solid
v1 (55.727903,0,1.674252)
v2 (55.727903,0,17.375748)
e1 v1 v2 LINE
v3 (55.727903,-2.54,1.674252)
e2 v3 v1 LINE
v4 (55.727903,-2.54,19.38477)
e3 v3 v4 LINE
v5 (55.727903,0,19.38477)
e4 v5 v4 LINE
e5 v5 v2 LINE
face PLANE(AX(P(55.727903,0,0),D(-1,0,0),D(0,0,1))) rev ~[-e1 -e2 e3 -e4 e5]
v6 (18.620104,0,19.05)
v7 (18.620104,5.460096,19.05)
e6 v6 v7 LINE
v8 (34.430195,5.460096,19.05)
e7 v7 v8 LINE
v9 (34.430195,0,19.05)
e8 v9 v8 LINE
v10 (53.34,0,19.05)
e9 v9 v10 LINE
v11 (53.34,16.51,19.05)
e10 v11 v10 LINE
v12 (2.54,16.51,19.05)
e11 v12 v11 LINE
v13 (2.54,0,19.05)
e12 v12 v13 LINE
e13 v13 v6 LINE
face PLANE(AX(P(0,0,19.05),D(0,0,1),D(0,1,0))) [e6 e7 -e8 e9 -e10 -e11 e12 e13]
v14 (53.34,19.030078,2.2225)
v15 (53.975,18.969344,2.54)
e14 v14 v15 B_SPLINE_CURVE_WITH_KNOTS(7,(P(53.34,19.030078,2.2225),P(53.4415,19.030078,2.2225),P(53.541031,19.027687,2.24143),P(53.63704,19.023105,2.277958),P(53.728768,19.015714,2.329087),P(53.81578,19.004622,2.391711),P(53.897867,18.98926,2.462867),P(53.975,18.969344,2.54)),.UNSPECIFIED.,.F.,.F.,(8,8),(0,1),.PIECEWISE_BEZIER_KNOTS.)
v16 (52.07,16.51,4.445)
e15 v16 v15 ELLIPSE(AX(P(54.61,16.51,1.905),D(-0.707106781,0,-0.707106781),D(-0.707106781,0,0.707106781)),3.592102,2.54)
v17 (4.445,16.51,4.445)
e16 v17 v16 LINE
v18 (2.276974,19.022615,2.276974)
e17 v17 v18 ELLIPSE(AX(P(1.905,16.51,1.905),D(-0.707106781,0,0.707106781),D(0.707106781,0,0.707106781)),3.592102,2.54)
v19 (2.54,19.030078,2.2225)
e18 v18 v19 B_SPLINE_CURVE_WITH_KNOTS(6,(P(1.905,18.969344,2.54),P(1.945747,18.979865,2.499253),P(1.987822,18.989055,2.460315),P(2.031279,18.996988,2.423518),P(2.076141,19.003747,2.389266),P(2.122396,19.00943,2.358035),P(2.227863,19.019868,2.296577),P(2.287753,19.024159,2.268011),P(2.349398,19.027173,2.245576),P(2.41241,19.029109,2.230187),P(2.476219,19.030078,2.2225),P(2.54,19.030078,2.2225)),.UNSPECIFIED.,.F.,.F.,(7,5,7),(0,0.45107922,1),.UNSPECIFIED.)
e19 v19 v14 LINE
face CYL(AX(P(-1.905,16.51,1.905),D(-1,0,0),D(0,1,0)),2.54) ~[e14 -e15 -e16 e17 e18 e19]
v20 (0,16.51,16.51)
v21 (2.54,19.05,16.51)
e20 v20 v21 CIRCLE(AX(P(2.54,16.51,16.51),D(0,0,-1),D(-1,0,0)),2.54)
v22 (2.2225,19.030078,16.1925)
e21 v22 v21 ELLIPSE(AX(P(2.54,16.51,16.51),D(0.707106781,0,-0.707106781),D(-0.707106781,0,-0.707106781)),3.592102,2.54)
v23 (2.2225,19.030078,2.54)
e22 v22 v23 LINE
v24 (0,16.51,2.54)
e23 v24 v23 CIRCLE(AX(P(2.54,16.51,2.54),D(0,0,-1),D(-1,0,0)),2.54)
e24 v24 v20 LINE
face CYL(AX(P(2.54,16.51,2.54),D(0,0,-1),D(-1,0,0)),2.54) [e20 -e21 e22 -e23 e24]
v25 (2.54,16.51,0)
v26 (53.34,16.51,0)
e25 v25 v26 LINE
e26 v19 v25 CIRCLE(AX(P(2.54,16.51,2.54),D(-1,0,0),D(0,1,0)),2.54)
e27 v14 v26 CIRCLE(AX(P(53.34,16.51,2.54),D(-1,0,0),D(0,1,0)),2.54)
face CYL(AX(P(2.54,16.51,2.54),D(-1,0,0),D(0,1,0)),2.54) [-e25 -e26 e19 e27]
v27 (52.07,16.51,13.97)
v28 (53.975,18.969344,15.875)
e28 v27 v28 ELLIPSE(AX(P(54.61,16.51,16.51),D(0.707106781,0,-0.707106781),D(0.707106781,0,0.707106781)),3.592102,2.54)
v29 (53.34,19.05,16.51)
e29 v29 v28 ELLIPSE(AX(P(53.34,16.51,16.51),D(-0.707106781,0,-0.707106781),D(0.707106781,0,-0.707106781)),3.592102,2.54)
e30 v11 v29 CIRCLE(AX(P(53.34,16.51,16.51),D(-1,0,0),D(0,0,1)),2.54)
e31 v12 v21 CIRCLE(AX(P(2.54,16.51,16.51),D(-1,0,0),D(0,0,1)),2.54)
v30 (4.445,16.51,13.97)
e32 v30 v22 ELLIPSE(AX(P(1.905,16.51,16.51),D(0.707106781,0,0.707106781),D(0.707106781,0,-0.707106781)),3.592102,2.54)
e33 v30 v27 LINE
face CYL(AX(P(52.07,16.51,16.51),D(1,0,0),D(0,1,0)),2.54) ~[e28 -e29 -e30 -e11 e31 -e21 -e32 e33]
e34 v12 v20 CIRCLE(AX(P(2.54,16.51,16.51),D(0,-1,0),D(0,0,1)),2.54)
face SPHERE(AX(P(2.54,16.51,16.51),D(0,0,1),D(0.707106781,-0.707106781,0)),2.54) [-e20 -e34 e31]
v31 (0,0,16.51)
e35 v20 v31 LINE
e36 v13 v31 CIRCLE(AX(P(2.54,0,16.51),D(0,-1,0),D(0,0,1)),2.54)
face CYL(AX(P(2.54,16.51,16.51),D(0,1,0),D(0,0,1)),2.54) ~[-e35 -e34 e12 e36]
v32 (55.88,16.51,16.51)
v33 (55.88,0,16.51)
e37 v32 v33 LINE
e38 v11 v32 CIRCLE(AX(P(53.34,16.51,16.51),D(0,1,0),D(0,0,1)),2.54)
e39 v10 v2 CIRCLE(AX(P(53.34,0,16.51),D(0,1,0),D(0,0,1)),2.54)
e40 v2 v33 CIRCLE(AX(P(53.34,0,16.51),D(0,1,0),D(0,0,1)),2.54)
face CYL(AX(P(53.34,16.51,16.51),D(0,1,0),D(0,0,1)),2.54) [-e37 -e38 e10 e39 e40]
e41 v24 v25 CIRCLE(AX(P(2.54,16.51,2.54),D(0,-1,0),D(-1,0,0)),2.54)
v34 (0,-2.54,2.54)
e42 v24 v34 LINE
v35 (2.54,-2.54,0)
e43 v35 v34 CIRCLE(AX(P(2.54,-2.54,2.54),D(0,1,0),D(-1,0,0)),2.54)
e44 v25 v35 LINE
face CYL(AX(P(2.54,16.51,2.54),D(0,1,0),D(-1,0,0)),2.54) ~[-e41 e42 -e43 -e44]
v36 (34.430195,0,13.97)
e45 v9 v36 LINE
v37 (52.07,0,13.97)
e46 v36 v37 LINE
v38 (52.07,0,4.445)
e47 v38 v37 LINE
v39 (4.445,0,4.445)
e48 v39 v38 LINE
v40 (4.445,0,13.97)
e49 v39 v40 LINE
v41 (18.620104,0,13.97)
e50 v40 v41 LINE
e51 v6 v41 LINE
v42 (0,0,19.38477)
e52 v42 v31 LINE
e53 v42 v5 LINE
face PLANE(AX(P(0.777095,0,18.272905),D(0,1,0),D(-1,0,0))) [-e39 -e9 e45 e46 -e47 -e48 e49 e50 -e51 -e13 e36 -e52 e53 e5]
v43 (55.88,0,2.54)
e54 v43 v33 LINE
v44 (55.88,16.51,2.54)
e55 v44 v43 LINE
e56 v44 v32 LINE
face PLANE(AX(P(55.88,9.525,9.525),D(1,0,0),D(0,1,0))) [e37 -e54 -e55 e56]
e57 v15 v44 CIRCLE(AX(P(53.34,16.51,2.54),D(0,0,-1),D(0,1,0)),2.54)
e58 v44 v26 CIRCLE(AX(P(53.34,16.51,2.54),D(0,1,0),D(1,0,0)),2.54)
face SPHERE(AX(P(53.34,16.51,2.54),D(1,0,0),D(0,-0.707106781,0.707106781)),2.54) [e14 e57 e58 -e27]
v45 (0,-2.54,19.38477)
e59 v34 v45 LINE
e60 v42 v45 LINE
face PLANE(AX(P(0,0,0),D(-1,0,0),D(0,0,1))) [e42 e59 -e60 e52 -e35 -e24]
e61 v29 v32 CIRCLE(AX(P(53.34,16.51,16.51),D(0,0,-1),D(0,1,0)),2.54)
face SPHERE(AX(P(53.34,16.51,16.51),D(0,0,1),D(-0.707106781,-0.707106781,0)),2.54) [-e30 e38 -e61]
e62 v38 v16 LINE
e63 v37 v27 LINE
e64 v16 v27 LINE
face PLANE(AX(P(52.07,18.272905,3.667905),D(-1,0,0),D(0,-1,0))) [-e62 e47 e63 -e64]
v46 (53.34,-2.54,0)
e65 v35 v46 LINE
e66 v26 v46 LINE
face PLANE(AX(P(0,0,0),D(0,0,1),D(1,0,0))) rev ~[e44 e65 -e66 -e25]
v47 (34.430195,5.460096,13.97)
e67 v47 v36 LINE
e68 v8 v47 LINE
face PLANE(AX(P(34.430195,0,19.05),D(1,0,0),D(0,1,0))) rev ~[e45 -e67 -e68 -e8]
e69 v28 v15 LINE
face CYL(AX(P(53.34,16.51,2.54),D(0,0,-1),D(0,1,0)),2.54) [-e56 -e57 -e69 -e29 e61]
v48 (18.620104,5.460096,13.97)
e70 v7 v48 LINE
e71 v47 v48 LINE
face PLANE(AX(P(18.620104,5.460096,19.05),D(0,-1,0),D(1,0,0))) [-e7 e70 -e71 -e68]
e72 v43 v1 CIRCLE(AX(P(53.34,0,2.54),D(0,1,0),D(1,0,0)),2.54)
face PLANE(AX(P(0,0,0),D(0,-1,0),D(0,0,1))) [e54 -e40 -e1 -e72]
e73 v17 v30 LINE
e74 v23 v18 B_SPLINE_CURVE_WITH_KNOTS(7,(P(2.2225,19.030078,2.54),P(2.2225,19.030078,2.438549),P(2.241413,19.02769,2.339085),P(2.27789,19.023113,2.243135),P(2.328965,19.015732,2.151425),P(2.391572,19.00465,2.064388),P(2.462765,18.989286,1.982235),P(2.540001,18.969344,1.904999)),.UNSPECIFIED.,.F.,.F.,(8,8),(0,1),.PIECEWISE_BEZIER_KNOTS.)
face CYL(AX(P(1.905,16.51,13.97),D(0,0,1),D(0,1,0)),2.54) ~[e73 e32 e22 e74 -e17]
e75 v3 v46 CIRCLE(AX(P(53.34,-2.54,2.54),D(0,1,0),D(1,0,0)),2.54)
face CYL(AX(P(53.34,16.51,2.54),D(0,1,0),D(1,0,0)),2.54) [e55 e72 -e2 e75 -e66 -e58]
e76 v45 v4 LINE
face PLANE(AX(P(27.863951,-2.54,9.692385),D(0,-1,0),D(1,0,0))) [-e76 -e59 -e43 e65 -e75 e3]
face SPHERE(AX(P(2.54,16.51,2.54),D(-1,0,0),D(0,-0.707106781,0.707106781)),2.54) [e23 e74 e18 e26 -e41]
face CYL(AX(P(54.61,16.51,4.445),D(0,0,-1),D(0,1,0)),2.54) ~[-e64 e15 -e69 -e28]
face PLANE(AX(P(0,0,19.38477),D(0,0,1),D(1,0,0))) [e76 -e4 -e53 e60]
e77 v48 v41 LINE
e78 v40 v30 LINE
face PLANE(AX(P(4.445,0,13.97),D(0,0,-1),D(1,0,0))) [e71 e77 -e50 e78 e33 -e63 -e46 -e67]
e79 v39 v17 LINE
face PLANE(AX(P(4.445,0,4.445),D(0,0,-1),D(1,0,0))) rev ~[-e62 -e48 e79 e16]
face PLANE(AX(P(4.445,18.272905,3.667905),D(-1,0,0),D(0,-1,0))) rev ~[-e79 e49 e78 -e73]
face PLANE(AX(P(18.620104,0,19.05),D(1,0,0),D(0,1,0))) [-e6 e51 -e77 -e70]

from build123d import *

# Parameters (mm, degrees)
F0_W         = 19.05
F0_H         = 19.05
F1_DEPTH     = 55.88
F2_W         = 47.625
F2_H         = 9.525
F3_DEPTH     = 25.4
F4_W         = 55.7279027998
F4_H         = 19.3847697228
F5_DEPTH     = 2.54
F6_T1_DEPTH  = 50.8
F6_T3_DEPTH  = 13.97
F6_T5_DEPTH  = 47.625
F6_T7_DEPTH  = 9.525
F6_T9_DEPTH  = 16.51
F6_T11_DEPTH = 25.4
F6_T13_DEPTH = 22.86
F6_S17_W     = 2.5908
F6_S17_H     = 2.5908
F6_T18_DEPTH = 2.5908
F6_S23_W     = 2.5908
F6_S23_H     = 2.5908
F6_T24_DEPTH = 2.5908
F6_S29_W     = 2.5908
F6_S29_H     = 2.5908
F6_T30_DEPTH = 2.5908
F6_S35_W     = 2.5908
F6_S35_H     = 2.5908
F6_T36_DEPTH = 2.5908
F6_T43_DEPTH = 53.975
F6_T48_DEPTH = 15.875
F6_T56_DEPTH = 53.975
F6_T61_DEPTH = 15.875
F6_T69_DEPTH = 15.875
F6_T74_DEPTH = 53.975
F6_T82_DEPTH = 53.975
F6_T87_DEPTH = 15.875
F7_W         = 15.8100910485
F7_H         = 5.4600955918
F8_DEPTH     = 12.7


# Not quite as in the source:
# - a fillet or chamfer that OpenCascade refuses, or shapes differently, is made with other operations: its cross-section is extruded or revolved along the edge and cut away or added


with BuildPart() as f1:
    # F0 (on Right) → F1 (new body)
    with BuildSketch(Plane.YZ):
        with Locations((9.525, 9.525)):
            Rectangle(F0_W, F0_H)
    extrude(amount=F1_DEPTH)

    # F2 (on face) → F3 (cut)
    with BuildSketch(Plane.XZ):
        with Locations((28.2575, 9.2075)):
            Rectangle(F2_W, F2_H)
    extrude(amount=-F3_DEPTH, mode=Mode.SUBTRACT)

    # F4 (on Front) → F5 (join)
    with BuildSketch(Plane.XZ):
        with Locations((27.8639513999, 9.6923848614)):
            Rectangle(F4_W, F4_H)
    extrude(amount=F5_DEPTH)

    # F6: fillet of radius 2.54 on 12 edges, made by hand

    # F6_s2 → F6_t1 (cut)
    with BuildSketch(Plane.YZ.offset(2.54)):
        with BuildLine():
            ThreePointArc((19.05, 2.54), (18.3060512242, 0.7439487758), (16.51, 0))
            Line((16.51, 0), (19.05, 0))
            Line((19.05, 0), (19.05, 2.54))
        make_face()
        with BuildLine():
            ThreePointArc((16.51, 19.05), (18.3060512242, 18.3060512242), (19.05, 16.51))
            Line((19.05, 16.51), (19.05, 19.05))
            Line((19.05, 19.05), (16.51, 19.05))
        make_face()
    extrude(amount=F6_T1_DEPTH, mode=Mode.SUBTRACT)

    # F6_s4 → F6_t3 (cut)
    with BuildSketch(Plane.XY.offset(2.54)):
        with BuildLine():
            ThreePointArc((0, 16.51), (0.7439487758, 18.3060512242), (2.54, 19.05))
            Line((2.54, 19.05), (0, 19.05))
            Line((0, 19.05), (0, 16.51))
        make_face()
        with BuildLine():
            ThreePointArc((53.34, 19.05), (55.1360512242, 18.3060512242), (55.88, 16.51))
            Line((55.88, 16.51), (55.88, 19.05))
            Line((55.88, 19.05), (53.34, 19.05))
        make_face()
    extrude(amount=F6_T3_DEPTH, mode=Mode.SUBTRACT)

    # F6_s6 → F6_t5 (cut)
    with BuildSketch(Plane.YZ.offset(4.445)):
        with BuildLine():
            ThreePointArc((19.05, 16.51), (18.3060512242, 14.7139487758), (16.51, 13.97))
            Line((16.51, 13.97), (19.05, 13.97))
            Line((19.05, 13.97), (19.05, 16.51))
        make_face()
        with BuildLine():
            ThreePointArc((19.05, 1.905), (18.3060512242, 3.7010512242), (16.51, 4.445))
            Line((16.51, 4.445), (19.05, 4.445))
            Line((19.05, 4.445), (19.05, 1.905))
        make_face()
    extrude(amount=F6_T5_DEPTH, mode=Mode.SUBTRACT)

    # F6_s8 → F6_t7 (cut)
    with BuildSketch(Plane.XY.offset(4.445)):
        with BuildLine():
            ThreePointArc((1.905, 19.05), (3.7010512242, 18.3060512242), (4.445, 16.51))
            Line((4.445, 16.51), (4.445, 19.05))
            Line((4.445, 19.05), (1.905, 19.05))
        make_face()
        with BuildLine():
            ThreePointArc((54.61, 19.05), (52.8139487758, 18.3060512242), (52.07, 16.51))
            Line((52.07, 16.51), (52.07, 19.05))
            Line((52.07, 19.05), (54.61, 19.05))
        make_face()
    extrude(amount=F6_T7_DEPTH, mode=Mode.SUBTRACT)

    # F6_s10 → F6_t9 (cut)
    with BuildSketch(Plane.XZ.offset(-16.51)):
        with BuildLine():
            ThreePointArc((2.54, 19.05), (0.7439487758, 18.3060512242), (0, 16.51))
            Line((0, 16.51), (0, 19.05))
            Line((0, 19.05), (2.54, 19.05))
        make_face()
        with BuildLine():
            ThreePointArc((53.34, 19.05), (55.1360512242, 18.3060512242), (55.88, 16.51))
            Line((55.88, 16.51), (55.88, 19.05))
            Line((55.88, 19.05), (53.34, 19.05))
        make_face()
    extrude(amount=F6_T9_DEPTH, mode=Mode.SUBTRACT)

    # F6_s12 → F6_t11 (cut)
    with BuildSketch(Plane.XZ.offset(-16.51)):
        with BuildLine():
            ThreePointArc((0, 2.54), (0.7439487758, 0.7439487758), (2.54, 0))
            Line((2.54, 0), (0, 0))
            Line((0, 0), (0, 2.54))
        make_face()
    extrude(amount=F6_T11_DEPTH, mode=Mode.SUBTRACT)

    # F6_s14 → F6_t13 (cut)
    with BuildSketch(Plane.XZ.offset(-16.51)):
        with BuildLine():
            ThreePointArc((55.88, 2.54), (55.1360512242, 0.7439487758), (53.34, 0))
            Line((53.34, 0), (55.88, 0))
            Line((55.88, 0), (55.88, 2.54))
        make_face()
    extrude(amount=F6_T13_DEPTH, mode=Mode.SUBTRACT)


with BuildPart() as f6_tool16:
    # F6_s17 → F6_t18 (new body)
    with BuildSketch(Plane.YZ.offset(2.54)):
        with Locations((17.8054, 1.2446)):
            Rectangle(F6_S17_W, F6_S17_H)
    extrude(amount=-F6_T18_DEPTH)

    # F6_s19 → F6_t20 (revolve, cut)
    with BuildSketch(Plane(origin=(2.54, 16.51, 2.54), x_dir=(0, -0.7071067812, 0.7071067812), z_dir=(0, -0.7071067812, -0.7071067812))):
        with BuildLine():
            ThreePointArc((0, -2.54), (2.54, 0), (0, 2.54))
            Line((0, 2.54), (0, -2.54))
        make_face()
    revolve(axis=Axis((2.54, 16.51, 2.54), (-1, 0, 0)), mode=Mode.SUBTRACT)


with BuildPart() as f1_1:
    add(f1.part)

    # F6_t15: cut F6_tool16
    add(f6_tool16.part, mode=Mode.SUBTRACT)


with BuildPart() as f6_tool22:
    # F6_s23 → F6_t24 (new body)
    with BuildSketch(Plane.YZ.offset(53.34)):
        with Locations((17.8054, 1.2446)):
            Rectangle(F6_S23_W, F6_S23_H)
    extrude(amount=F6_T24_DEPTH)

    # F6_s25 → F6_t26 (revolve, cut)
    with BuildSketch(Plane(origin=(53.34, 16.51, 2.54), x_dir=(0, -0.7071067812, 0.7071067812), z_dir=(0, 0.7071067812, 0.7071067812))):
        with BuildLine():
            ThreePointArc((0, -2.54), (2.54, 0), (0, 2.54))
            Line((0, 2.54), (0, -2.54))
        make_face()
    revolve(axis=Axis((53.34, 16.51, 2.54), (1, 0, 0)), mode=Mode.SUBTRACT)


with BuildPart() as f1_2:
    add(f1_1.part)

    # F6_t21: cut F6_tool22
    add(f6_tool22.part, mode=Mode.SUBTRACT)


with BuildPart() as f6_tool28:
    # F6_s29 → F6_t30 (new body)
    with BuildSketch(Plane.XY.offset(16.51)):
        with Locations((1.2446, 17.8054)):
            Rectangle(F6_S29_W, F6_S29_H)
    extrude(amount=F6_T30_DEPTH)

    # F6_s31 → F6_t32 (revolve, cut)
    with BuildSketch(Plane(origin=(2.54, 16.51, 16.51), x_dir=(0.7071067812, -0.7071067812, 0), z_dir=(-0.7071067812, -0.7071067812, 0))):
        with BuildLine():
            ThreePointArc((0, -2.54), (2.54, 0), (0, 2.54))
            Line((0, 2.54), (0, -2.54))
        make_face()
    revolve(axis=Axis((2.54, 16.51, 16.51), (0, 0, 1)), mode=Mode.SUBTRACT)


with BuildPart() as f1_3:
    add(f1_2.part)

    # F6_t27: cut F6_tool28
    add(f6_tool28.part, mode=Mode.SUBTRACT)


with BuildPart() as f6_tool34:
    # F6_s35 → F6_t36 (new body)
    with BuildSketch(Plane.XY.offset(16.51)):
        with Locations((54.6354, 17.8054)):
            Rectangle(F6_S35_W, F6_S35_H)
    extrude(amount=F6_T36_DEPTH)

    # F6_s37 → F6_t38 (revolve, cut)
    with BuildSketch(Plane(origin=(53.34, 16.51, 16.51), x_dir=(-0.7071067812, -0.7071067812, 0), z_dir=(-0.7071067812, 0.7071067812, 0))):
        with BuildLine():
            ThreePointArc((0, -2.54), (2.54, 0), (0, 2.54))
            Line((0, 2.54), (0, -2.54))
        make_face()
    revolve(axis=Axis((53.34, 16.51, 16.51), (0, 0, 1)), mode=Mode.SUBTRACT)


with BuildPart() as f1_4:
    add(f1_3.part)

    # F6_t33: cut F6_tool34
    add(f6_tool34.part, mode=Mode.SUBTRACT)


with BuildPart() as f6_tool41:
    # F6_s42 → F6_t43 (new body)
    with BuildSketch(Plane.YZ.offset(58.42)):
        with BuildLine():
            ThreePointArc((19.05, 16.51), (18.3060512242, 14.7139487758), (16.51, 13.97))
            Line((16.51, 13.97), (19.05, 13.97))
            Line((19.05, 13.97), (19.05, 16.51))
        make_face()
    extrude(amount=-F6_T43_DEPTH)

    split(bisect_by=Plane.YZ.offset(52.07), keep=Keep.TOP)

    split(bisect_by=Plane.YZ.offset(55.88), keep=Keep.BOTTOM)


with BuildPart() as f6_tool46:
    # F6_s47 → F6_t48 (new body)
    with BuildSketch(Plane.XY.offset(4.445)):
        with BuildLine():
            ThreePointArc((54.61, 19.05), (52.8139487758, 18.3060512242), (52.07, 16.51))
            Line((52.07, 16.51), (52.07, 19.05))
            Line((52.07, 19.05), (54.61, 19.05))
        make_face()
    extrude(amount=F6_T48_DEPTH)

    split(bisect_by=Plane.XY.offset(19.05), keep=Keep.BOTTOM)

    split(bisect_by=Plane.XY.offset(13.97), keep=Keep.TOP)


with BuildPart() as f6_tool41_1:
    add(f6_tool41.part)

    # F6_t51: intersect F6_tool46
    add(f6_tool46.part, mode=Mode.INTERSECT)


with BuildPart() as f1_5:
    add(f1_4.part)

    # F6_t39: cut F6_tool41
    add(f6_tool41_1.part, mode=Mode.SUBTRACT)


with BuildPart() as f6_tool54:
    # F6_s55 → F6_t56 (new body)
    with BuildSketch(Plane.YZ.offset(52.07)):
        with BuildLine():
            ThreePointArc((19.05, 16.51), (18.3060512242, 14.7139487758), (16.51, 13.97))
            Line((16.51, 13.97), (19.05, 13.97))
            Line((19.05, 13.97), (19.05, 16.51))
        make_face()
    extrude(amount=-F6_T56_DEPTH)

    split(bisect_by=Plane.YZ, keep=Keep.TOP)

    split(bisect_by=Plane.YZ.offset(4.445), keep=Keep.BOTTOM)


with BuildPart() as f6_tool59:
    # F6_s60 → F6_t61 (new body)
    with BuildSketch(Plane.XY.offset(20.32)):
        with BuildLine():
            ThreePointArc((1.905, 19.05), (3.7010512242, 18.3060512242), (4.445, 16.51))
            Line((4.445, 16.51), (4.445, 19.05))
            Line((4.445, 19.05), (1.905, 19.05))
        make_face()
    extrude(amount=-F6_T61_DEPTH)

    split(bisect_by=Plane.XY.offset(19.05), keep=Keep.BOTTOM)

    split(bisect_by=Plane.XY.offset(13.97), keep=Keep.TOP)


with BuildPart() as f6_tool54_1:
    add(f6_tool54.part)

    # F6_t64: intersect F6_tool59
    add(f6_tool59.part, mode=Mode.INTERSECT)


with BuildPart() as f1_6:
    add(f1_5.part)

    # F6_t52: cut F6_tool54
    add(f6_tool54_1.part, mode=Mode.SUBTRACT)


with BuildPart() as f6_tool67:
    # F6_s68 → F6_t69 (new body)
    with BuildSketch(Plane.XY.offset(13.97)):
        with BuildLine():
            ThreePointArc((1.905, 19.05), (3.7010512242, 18.3060512242), (4.445, 16.51))
            Line((4.445, 16.51), (4.445, 19.05))
            Line((4.445, 19.05), (1.905, 19.05))
        make_face()
    extrude(amount=-F6_T69_DEPTH)

    split(bisect_by=Plane.XY.offset(4.445), keep=Keep.BOTTOM)

    split(bisect_by=Plane.XY, keep=Keep.TOP)


with BuildPart() as f6_tool72:
    # F6_s73 → F6_t74 (new body)
    with BuildSketch(Plane.YZ.offset(-1.905)):
        with BuildLine():
            ThreePointArc((19.05, 1.905), (18.3060512242, 3.7010512242), (16.51, 4.445))
            Line((16.51, 4.445), (19.05, 4.445))
            Line((19.05, 4.445), (19.05, 1.905))
        make_face()
    extrude(amount=F6_T74_DEPTH)

    split(bisect_by=Plane.YZ, keep=Keep.TOP)

    split(bisect_by=Plane.YZ.offset(4.445), keep=Keep.BOTTOM)


with BuildPart() as f6_tool67_1:
    add(f6_tool67.part)

    # F6_t77: intersect F6_tool72
    add(f6_tool72.part, mode=Mode.INTERSECT)


with BuildPart() as f1_7:
    add(f1_6.part)

    # F6_t65: cut F6_tool67
    add(f6_tool67_1.part, mode=Mode.SUBTRACT)


with BuildPart() as f6_tool80:
    # F6_s81 → F6_t82 (new body)
    with BuildSketch(Plane.YZ.offset(4.445)):
        with BuildLine():
            ThreePointArc((19.05, 1.905), (18.3060512242, 3.7010512242), (16.51, 4.445))
            Line((16.51, 4.445), (19.05, 4.445))
            Line((19.05, 4.445), (19.05, 1.905))
        make_face()
    extrude(amount=F6_T82_DEPTH)

    split(bisect_by=Plane.YZ.offset(52.07), keep=Keep.TOP)

    split(bisect_by=Plane.YZ.offset(55.88), keep=Keep.BOTTOM)


with BuildPart() as f6_tool85:
    # F6_s86 → F6_t87 (new body)
    with BuildSketch(Plane.XY.offset(-1.905)):
        with BuildLine():
            ThreePointArc((54.61, 19.05), (52.8139487758, 18.3060512242), (52.07, 16.51))
            Line((52.07, 16.51), (52.07, 19.05))
            Line((52.07, 19.05), (54.61, 19.05))
        make_face()
    extrude(amount=F6_T87_DEPTH)

    split(bisect_by=Plane.XY.offset(4.445), keep=Keep.BOTTOM)

    split(bisect_by=Plane.XY, keep=Keep.TOP)


with BuildPart() as f6_tool80_1:
    add(f6_tool80.part)

    # F6_t90: intersect F6_tool85
    add(f6_tool85.part, mode=Mode.INTERSECT)


with BuildPart() as f1_8:
    add(f1_7.part)

    # F6_t78: cut F6_tool80
    add(f6_tool80_1.part, mode=Mode.SUBTRACT)

    # F7 (on face) → F8 (cut)
    with BuildSketch(Plane.XY.offset(19.05)):
        with Locations((26.5251491219, 2.7300477959)):
            Rectangle(F7_W, F7_H)
    extrude(amount=-F8_DEPTH, mode=Mode.SUBTRACT)


solid = f1_8.part
